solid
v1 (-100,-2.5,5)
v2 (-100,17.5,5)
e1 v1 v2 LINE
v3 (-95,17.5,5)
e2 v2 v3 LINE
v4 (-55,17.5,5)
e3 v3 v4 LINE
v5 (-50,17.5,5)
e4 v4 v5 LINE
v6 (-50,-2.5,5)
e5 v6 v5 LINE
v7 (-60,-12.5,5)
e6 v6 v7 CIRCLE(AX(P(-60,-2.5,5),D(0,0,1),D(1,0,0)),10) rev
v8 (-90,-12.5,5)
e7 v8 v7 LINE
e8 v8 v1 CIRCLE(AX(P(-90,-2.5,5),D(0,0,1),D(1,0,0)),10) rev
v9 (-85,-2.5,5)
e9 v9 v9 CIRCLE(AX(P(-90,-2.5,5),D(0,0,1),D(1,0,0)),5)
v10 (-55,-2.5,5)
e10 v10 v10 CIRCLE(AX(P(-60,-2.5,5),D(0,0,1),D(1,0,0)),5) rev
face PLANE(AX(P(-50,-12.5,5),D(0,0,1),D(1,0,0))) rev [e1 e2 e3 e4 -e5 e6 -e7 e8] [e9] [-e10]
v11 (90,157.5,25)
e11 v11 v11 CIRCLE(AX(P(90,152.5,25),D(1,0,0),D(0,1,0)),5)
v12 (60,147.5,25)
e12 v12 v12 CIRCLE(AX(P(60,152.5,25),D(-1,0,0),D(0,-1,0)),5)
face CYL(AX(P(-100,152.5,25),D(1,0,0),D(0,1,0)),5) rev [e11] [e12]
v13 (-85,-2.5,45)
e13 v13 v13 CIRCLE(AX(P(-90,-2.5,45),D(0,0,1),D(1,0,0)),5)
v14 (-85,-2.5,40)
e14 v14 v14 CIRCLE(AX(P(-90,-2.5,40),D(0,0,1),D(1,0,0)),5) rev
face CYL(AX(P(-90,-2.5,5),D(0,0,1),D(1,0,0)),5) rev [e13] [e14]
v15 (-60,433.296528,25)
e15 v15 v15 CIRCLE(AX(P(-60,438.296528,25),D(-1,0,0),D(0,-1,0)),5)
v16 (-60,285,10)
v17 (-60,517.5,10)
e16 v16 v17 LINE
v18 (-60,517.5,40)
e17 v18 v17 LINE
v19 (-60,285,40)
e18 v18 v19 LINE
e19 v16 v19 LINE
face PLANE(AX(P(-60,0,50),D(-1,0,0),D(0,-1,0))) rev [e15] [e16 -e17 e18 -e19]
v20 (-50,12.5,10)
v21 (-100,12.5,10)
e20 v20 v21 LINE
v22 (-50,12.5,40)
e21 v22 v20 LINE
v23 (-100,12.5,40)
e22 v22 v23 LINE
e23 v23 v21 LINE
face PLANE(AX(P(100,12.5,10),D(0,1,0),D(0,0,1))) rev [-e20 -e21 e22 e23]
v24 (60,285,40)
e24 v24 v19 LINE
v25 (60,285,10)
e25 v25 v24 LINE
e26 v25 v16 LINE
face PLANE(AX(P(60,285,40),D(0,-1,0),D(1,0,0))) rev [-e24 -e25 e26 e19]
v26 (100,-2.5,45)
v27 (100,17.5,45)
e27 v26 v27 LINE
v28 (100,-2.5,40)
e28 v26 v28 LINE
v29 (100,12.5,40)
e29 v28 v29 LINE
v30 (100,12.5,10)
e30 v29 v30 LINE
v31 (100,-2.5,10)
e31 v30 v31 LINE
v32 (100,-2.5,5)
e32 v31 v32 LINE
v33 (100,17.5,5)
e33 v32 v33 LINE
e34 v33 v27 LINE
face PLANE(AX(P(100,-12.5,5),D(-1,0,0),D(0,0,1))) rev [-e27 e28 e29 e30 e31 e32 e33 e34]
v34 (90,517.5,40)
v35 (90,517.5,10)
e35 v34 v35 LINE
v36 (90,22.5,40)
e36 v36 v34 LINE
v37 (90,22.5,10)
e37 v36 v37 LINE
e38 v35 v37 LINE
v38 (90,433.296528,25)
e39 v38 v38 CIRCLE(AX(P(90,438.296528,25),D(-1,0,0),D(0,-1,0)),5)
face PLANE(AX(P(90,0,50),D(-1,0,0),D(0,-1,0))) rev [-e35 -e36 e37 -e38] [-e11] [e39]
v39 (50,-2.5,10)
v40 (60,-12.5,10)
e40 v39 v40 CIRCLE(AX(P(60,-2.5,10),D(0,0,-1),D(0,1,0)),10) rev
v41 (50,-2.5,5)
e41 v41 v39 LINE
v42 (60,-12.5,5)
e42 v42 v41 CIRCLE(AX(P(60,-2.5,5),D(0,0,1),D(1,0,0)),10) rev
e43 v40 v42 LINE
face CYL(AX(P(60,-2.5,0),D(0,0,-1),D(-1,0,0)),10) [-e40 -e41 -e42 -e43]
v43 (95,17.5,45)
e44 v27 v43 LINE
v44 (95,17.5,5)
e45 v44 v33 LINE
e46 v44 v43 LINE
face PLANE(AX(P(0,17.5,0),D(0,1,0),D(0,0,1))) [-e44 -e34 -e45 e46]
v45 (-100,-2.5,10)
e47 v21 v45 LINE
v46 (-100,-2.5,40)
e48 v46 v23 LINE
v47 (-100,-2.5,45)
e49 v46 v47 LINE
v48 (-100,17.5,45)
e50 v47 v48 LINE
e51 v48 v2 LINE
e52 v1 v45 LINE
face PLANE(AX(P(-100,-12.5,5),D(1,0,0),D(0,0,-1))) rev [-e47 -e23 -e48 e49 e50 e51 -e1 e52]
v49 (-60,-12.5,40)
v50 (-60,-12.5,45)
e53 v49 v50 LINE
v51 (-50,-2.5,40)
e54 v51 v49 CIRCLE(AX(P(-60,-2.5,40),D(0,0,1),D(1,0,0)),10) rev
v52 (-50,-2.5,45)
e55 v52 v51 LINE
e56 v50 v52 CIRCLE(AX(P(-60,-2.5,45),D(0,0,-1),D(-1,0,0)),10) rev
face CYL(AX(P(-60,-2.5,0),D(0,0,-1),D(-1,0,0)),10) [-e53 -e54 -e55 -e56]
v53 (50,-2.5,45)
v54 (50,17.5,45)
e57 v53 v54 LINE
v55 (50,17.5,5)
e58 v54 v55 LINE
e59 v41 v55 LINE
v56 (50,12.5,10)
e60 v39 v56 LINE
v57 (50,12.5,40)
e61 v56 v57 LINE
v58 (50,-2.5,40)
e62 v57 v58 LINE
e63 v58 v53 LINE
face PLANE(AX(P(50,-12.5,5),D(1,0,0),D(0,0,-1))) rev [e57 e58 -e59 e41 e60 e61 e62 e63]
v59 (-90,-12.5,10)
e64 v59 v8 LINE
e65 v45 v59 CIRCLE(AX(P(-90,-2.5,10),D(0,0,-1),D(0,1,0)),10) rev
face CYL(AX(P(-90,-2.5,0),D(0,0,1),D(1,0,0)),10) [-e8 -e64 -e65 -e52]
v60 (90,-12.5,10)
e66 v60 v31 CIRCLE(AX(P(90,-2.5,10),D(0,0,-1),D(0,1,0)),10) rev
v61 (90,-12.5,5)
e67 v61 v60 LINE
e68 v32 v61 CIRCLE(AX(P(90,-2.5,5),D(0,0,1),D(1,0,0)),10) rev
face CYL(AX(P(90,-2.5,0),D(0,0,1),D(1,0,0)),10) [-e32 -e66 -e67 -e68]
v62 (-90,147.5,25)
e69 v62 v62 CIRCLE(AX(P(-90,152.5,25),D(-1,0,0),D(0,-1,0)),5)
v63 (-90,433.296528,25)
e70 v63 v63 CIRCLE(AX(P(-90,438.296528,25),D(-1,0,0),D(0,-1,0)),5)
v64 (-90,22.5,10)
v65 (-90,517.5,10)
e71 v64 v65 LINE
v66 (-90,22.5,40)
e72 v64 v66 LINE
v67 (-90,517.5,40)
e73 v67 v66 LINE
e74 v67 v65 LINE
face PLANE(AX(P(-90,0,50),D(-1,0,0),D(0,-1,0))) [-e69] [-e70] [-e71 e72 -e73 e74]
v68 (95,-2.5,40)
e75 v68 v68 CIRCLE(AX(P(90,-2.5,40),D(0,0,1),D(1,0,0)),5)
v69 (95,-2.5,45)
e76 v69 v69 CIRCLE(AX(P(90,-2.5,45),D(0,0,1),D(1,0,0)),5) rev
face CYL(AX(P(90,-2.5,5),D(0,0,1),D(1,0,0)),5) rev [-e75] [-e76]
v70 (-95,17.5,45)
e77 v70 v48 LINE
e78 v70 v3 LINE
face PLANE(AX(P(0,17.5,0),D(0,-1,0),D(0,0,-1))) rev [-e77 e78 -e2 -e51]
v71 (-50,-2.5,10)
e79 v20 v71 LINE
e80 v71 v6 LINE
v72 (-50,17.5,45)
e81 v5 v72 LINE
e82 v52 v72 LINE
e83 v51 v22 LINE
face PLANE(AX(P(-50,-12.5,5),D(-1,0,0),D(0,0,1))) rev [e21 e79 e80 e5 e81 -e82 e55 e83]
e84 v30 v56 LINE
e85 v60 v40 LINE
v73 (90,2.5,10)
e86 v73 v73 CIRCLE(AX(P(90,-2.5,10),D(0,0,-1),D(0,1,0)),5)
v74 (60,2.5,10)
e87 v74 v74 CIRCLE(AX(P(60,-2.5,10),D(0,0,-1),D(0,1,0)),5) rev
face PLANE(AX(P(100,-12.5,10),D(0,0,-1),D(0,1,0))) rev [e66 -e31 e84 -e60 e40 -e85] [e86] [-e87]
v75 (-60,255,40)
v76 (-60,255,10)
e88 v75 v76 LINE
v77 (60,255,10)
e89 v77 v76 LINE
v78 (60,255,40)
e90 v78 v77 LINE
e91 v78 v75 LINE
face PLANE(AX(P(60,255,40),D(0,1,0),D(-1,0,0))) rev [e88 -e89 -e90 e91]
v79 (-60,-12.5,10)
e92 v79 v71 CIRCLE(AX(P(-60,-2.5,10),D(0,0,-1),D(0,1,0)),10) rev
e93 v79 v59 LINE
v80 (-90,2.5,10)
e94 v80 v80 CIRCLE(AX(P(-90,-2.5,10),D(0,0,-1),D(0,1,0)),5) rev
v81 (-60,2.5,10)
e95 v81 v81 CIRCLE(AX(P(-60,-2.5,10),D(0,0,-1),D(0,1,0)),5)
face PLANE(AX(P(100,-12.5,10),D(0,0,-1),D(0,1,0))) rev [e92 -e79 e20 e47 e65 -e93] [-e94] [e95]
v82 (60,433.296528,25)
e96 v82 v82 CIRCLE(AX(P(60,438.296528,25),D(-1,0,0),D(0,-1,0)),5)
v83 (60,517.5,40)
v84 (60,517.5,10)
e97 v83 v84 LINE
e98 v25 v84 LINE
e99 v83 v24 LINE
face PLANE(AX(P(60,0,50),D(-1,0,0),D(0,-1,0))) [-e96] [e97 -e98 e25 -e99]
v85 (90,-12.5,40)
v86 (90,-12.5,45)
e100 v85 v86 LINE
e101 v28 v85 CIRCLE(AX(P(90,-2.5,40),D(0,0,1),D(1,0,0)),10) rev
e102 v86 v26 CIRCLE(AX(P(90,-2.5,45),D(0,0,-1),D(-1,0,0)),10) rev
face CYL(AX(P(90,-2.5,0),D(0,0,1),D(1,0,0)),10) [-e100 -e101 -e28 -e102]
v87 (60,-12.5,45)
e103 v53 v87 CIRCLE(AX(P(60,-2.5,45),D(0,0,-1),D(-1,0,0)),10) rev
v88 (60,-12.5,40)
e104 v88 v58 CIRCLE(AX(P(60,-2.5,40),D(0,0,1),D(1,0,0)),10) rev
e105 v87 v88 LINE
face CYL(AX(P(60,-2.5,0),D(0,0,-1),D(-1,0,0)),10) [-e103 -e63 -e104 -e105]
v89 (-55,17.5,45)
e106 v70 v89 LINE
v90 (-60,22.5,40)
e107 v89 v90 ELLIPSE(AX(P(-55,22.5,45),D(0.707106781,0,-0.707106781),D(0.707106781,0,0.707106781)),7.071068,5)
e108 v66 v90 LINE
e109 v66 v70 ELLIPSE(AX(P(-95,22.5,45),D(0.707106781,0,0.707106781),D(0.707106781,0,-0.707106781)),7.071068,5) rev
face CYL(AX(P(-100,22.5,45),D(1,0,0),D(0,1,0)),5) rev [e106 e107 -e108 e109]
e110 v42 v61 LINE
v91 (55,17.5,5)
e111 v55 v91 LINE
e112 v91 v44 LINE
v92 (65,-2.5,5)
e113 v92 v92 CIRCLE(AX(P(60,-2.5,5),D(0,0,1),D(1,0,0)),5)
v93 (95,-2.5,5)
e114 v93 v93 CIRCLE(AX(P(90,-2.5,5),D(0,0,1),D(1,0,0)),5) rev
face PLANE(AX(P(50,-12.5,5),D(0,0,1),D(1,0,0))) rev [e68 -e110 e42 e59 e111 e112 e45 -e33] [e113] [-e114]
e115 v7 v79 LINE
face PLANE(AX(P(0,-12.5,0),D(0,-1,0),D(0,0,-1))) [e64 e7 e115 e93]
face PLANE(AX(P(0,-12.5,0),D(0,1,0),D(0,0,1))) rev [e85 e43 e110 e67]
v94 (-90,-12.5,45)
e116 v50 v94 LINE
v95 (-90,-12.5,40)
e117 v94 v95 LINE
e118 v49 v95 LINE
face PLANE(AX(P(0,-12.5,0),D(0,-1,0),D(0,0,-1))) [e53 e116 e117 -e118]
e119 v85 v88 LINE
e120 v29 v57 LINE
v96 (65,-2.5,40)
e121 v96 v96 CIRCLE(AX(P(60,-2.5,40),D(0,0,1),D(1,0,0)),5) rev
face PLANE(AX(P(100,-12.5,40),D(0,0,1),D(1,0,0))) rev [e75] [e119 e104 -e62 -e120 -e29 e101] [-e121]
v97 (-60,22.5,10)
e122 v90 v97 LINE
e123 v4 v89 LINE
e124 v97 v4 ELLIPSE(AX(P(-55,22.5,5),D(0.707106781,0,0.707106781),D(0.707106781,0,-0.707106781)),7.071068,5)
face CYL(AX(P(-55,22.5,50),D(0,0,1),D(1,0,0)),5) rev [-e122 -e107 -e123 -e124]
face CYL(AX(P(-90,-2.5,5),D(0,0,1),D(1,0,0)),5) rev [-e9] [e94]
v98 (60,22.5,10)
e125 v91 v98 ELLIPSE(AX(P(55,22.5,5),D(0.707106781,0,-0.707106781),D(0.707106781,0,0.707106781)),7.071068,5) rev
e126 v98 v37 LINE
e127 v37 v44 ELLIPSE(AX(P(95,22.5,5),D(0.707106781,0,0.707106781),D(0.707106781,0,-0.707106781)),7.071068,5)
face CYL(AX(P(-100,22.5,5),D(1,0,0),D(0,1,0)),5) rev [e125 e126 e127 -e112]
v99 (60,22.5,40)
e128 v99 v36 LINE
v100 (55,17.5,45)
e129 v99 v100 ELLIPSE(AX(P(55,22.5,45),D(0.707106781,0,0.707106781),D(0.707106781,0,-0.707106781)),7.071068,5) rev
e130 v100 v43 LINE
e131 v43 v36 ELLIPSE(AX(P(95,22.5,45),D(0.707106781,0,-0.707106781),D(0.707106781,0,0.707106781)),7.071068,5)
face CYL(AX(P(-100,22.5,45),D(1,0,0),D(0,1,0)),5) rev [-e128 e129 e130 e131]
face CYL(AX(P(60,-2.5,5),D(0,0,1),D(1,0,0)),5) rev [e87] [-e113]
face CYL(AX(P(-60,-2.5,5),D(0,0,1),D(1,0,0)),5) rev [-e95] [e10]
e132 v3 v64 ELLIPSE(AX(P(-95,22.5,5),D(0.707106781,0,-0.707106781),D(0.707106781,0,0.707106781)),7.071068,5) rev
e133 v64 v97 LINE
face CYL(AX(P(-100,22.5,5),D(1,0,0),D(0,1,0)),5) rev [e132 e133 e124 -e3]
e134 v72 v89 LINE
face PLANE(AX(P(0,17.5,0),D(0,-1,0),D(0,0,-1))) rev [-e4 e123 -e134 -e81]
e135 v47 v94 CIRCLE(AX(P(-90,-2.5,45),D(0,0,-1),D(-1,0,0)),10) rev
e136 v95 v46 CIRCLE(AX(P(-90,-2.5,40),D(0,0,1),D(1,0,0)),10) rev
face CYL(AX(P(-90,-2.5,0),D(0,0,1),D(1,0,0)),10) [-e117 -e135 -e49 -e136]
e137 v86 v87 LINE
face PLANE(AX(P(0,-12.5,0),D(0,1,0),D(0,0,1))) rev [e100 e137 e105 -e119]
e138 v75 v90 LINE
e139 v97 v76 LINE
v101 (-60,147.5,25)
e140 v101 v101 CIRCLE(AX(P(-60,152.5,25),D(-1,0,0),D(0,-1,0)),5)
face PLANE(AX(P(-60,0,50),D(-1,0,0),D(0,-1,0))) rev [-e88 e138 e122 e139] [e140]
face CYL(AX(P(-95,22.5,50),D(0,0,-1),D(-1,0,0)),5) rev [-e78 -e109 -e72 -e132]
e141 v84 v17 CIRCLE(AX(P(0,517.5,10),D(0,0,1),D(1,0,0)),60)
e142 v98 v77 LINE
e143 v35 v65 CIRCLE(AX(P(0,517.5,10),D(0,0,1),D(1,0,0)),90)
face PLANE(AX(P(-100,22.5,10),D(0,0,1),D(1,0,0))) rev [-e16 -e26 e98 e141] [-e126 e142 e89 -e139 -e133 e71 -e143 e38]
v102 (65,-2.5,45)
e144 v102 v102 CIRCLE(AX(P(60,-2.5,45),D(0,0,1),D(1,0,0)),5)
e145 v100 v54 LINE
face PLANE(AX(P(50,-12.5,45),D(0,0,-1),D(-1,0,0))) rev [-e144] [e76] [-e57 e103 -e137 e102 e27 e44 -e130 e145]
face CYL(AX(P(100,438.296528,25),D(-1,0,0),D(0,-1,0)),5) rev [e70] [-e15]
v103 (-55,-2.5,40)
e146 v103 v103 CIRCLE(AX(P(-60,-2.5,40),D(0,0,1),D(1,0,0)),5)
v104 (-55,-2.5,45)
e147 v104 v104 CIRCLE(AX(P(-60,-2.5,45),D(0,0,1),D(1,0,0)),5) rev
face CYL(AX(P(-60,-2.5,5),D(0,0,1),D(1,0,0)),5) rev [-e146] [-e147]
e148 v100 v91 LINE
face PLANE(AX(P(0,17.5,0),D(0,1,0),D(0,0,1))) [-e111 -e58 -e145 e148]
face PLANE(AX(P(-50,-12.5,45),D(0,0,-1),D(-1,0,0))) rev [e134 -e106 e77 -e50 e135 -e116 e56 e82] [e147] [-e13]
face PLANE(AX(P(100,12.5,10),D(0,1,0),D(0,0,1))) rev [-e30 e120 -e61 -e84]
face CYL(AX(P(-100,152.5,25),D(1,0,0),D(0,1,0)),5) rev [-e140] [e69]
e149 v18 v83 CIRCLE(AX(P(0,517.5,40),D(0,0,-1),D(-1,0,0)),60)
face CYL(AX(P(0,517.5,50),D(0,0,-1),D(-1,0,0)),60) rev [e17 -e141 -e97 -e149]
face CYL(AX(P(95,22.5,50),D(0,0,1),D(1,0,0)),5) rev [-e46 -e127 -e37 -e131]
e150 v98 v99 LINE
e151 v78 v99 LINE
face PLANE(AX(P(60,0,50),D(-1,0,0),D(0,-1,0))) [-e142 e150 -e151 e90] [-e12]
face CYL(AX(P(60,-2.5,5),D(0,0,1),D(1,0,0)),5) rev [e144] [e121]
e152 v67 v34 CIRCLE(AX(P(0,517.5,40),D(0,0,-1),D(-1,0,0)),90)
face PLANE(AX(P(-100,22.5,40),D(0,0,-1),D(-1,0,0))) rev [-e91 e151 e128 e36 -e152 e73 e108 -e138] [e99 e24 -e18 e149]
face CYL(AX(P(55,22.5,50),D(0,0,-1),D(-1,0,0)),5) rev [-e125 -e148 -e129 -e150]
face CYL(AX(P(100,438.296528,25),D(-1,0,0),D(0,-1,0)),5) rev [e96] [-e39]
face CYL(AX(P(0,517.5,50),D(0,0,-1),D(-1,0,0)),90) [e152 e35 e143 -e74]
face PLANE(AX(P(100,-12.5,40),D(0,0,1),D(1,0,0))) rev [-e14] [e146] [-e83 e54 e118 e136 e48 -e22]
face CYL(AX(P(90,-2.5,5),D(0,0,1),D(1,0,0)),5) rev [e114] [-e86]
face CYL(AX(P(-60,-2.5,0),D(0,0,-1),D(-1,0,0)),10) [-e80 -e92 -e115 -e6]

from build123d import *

# Parameters (mm, degrees)
SKETCH1_R               = 5
BOSS_EXTRUDE1_DEPTH     = 50
SKETCH2_W               = 30
SKETCH2_H               = 30
CUT_EXTRUDE1_DEPTH      = 639.479639456
SKETCH3_W               = 30
SKETCH3_H               = 30
SKETCH3_W_2             = 5
SKETCH3_H_2             = 35
CUT_EXTRUDE2_DEPTH      = 642.526499842
FILLET1_R               = 5
SKETCH4_R               = 5
CUT_EXTRUDE3_DEPTH      = 639.10755363
SKETCH5_W               = 30
SKETCH5_H               = 30
BOSS_EXTRUDE2_DEPTH     = 120
SKETCH6_W               = 41.881061045
SKETCH6_H               = 38.598384764
CUT_EXTRUDE4_DEPTH      = 642.156182221
SKETCH7_W               = 50
SKETCH7_H               = 40
BOSS_EXTRUDE3_DEPTH     = 30
SKETCH8_R               = 5
CUT_EXTRUDE5_DEPTH      = 617.973459721
FILLET2_R               = 10
SKETCH9_W               = 30
SKETCH9_H               = 25
CUT_EXTRUDE6_DEPTH      = 642.156182221
CUT_EXTRUDE7_DEPTH      = 639.10755363
CUT_EXTRUDE7_DEPTH_BACK = 639.10755363
SKETCH10_R              = 5


with BuildPart() as part:
    # Sketch1 → Boss-Extrude1 (new body)
    with BuildSketch(Plane.XY):
        with BuildLine():
            Line((90, 17.5), (90, 517.5))
            ThreePointArc((90, 517.5), (0, 607.5), (-90, 517.5))
            Line((-90, 517.5), (-90, 17.5))
            Line((-90, 17.5), (-100, 17.5))
            Line((-100, 17.5), (-100, -7.5))
            ThreePointArc((-100, -7.5), (-97.071067812, -14.571067812), (-90, -17.5))
            Line((-90, -17.5), (-60, -17.5))
            ThreePointArc((-60, -17.5), (-52.928932188, -14.571067812), (-50, -7.5))
            Line((-50, -7.5), (-50, 17.5))
            Line((-50, 17.5), (-60, 17.5))
            Line((-60, 17.5), (-60, 517.5))
            ThreePointArc((-60, 517.5), (0, 577.5), (60, 517.5))
            Line((60, 517.5), (60, 17.5))
            Line((60, 17.5), (50, 17.5))
            Line((50, 17.5), (50, -7.5))
            ThreePointArc((50, -7.5), (52.928932188, -14.571067812), (60, -17.5))
            Line((60, -17.5), (90, -17.5))
            ThreePointArc((90, -17.5), (97.071067812, -14.571067812), (100, -7.5))
            Line((100, -7.5), (100, 17.5))
            Line((100, 17.5), (90, 17.5))
        make_face()
        with Locations((90, -7.5)):
            Circle(SKETCH1_R, mode=Mode.SUBTRACT)
        with Locations((60, -7.5)):
            Circle(SKETCH1_R, mode=Mode.SUBTRACT)
        with Locations((-90, -7.5)):
            Circle(SKETCH1_R, mode=Mode.SUBTRACT)
        with Locations((-60, -7.5)):
            Circle(SKETCH1_R, mode=Mode.SUBTRACT)
    extrude(amount=BOSS_EXTRUDE1_DEPTH)

    # Sketch2 → Cut-Extrude1 (cut, through all)
    with BuildSketch(Plane(origin=(90, 0, 0), x_dir=(0, 0, -1), z_dir=(1, 0, 0))):
        with BuildLine():
            Line((-50, 17.5), (-45, 17.5))
            ThreePointArc((-45, 17.5), (-41.464466094, 18.964466094), (-40, 22.5))
            Line((-40, 22.5), (-40, 607.5))
            Line((-40, 607.5), (-50, 607.5))
            Line((-50, 607.5), (-50, 17.5))
        make_face()
        with Locations((-25, -2.5)):
            Rectangle(SKETCH2_W, SKETCH2_H)
        with BuildLine():
            Line((-5, 17.5), (0, 17.5))
            Line((0, 17.5), (0, 607.5))
            Line((0, 607.5), (-10, 607.5))
            Line((-10, 607.5), (-10, 22.5))
            ThreePointArc((-10, 22.5), (-8.535533906, 18.964466094), (-5, 17.5))
        make_face()
    extrude(amount=-CUT_EXTRUDE1_DEPTH, mode=Mode.SUBTRACT)

    # Sketch3 → Cut-Extrude2 (cut, through all)
    with BuildSketch(Plane(origin=(100, 0, 0), x_dir=(0, 0, -1), z_dir=(1, 0, 0))):
        with Locations((-25, -2.5)):
            Rectangle(SKETCH3_W, SKETCH3_H)
        with Locations((-47.5, 0)):
            Rectangle(SKETCH3_W_2, SKETCH3_H_2)
        with Locations((-2.5, 0)):
            Rectangle(SKETCH3_W_2, SKETCH3_H_2)
    extrude(amount=-CUT_EXTRUDE2_DEPTH, mode=Mode.SUBTRACT)

    # Fillet1
    # the kernel refuses this fillet: 5 mm, written as the material it adds along each edge
    with BuildSketch(Plane(origin=(-90, 17.5, 5), x_dir=(-1, 0, 0), z_dir=(0, 0, 1))) as fillet1_piece_1_section:
        with BuildLine():
            CenterArc((FILLET1_R, -FILLET1_R), FILLET1_R, 90, 90)
            Line((0, -FILLET1_R), (0, 0))
            Line((0, 0), (FILLET1_R, 0))
        make_face()
    fillet1_piece_1 = extrude(amount=40, mode=Mode.PRIVATE)
    fillet1_piece_1 = fillet1_piece_1 - Plane(origin=(-91.427889151, 22.5, 45), x_dir=(0, -1, 0), z_dir=(1, 0, 0)) * Cylinder(5, 101, mode=Mode.PRIVATE)
    fillet1_piece_1 = fillet1_piece_1 - Plane(origin=(-91.427889151, 22.5, 5), x_dir=(0, 0, 1), z_dir=(1, 0, 0)) * Cylinder(5, 101, mode=Mode.PRIVATE)
    add(fillet1_piece_1)
    with BuildSketch(Plane(origin=(60, 17.5, 5), x_dir=(-1, 0, 0), z_dir=(0, 0, 1))) as fillet1_piece_2_section:
        with BuildLine():
            CenterArc((FILLET1_R, -FILLET1_R), FILLET1_R, 90, 90)
            Line((0, -FILLET1_R), (0, 0))
            Line((0, 0), (FILLET1_R, 0))
        make_face()
    fillet1_piece_2 = extrude(amount=40, mode=Mode.PRIVATE)
    fillet1_piece_2 = fillet1_piece_2 - Plane(origin=(58.572110849, 22.5, 5), x_dir=(0, 0, 1), z_dir=(1, 0, 0)) * Cylinder(5, 101, mode=Mode.PRIVATE)
    fillet1_piece_2 = fillet1_piece_2 - Plane(origin=(58.572110849, 22.5, 45), x_dir=(0, -1, 0), z_dir=(1, 0, 0)) * Cylinder(5, 101, mode=Mode.PRIVATE)
    add(fillet1_piece_2)
    with BuildSketch(Plane(origin=(-60, 17.5, 5), x_dir=(1, 0, 0), z_dir=(0, 0, 1))) as fillet1_piece_3_section:
        with BuildLine():
            CenterArc((FILLET1_R, FILLET1_R), FILLET1_R, 180, 90)
            Line((0, FILLET1_R), (0, 0))
            Line((0, 0), (FILLET1_R, 0))
        make_face()
    fillet1_piece_3 = extrude(amount=40, mode=Mode.PRIVATE)
    fillet1_piece_3 = fillet1_piece_3 - Plane(origin=(-58.572110849, 22.5, 45), x_dir=(0, -1, 0), z_dir=(1, 0, 0)) * Cylinder(5, 101, mode=Mode.PRIVATE)
    fillet1_piece_3 = fillet1_piece_3 - Plane(origin=(-58.572110849, 22.5, 5), x_dir=(0, 0, 1), z_dir=(1, 0, 0)) * Cylinder(5, 101, mode=Mode.PRIVATE)
    add(fillet1_piece_3)
    with BuildSketch(Plane(origin=(90, 17.5, 5), x_dir=(0, 1, 0), z_dir=(0, 0, 1))) as fillet1_piece_4_section:
        with BuildLine():
            CenterArc((FILLET1_R, -FILLET1_R), FILLET1_R, 90, 90)
            Line((0, -FILLET1_R), (0, 0))
            Line((0, 0), (FILLET1_R, 0))
        make_face()
    fillet1_piece_4 = extrude(amount=40, mode=Mode.PRIVATE)
    fillet1_piece_4 = fillet1_piece_4 - Plane(origin=(91.427889151, 22.5, 5), x_dir=(0, 0, 1), z_dir=(1, 0, 0)) * Cylinder(5, 101, mode=Mode.PRIVATE)
    fillet1_piece_4 = fillet1_piece_4 - Plane(origin=(91.427889151, 22.5, 45), x_dir=(0, -1, 0), z_dir=(1, 0, 0)) * Cylinder(5, 101, mode=Mode.PRIVATE)
    add(fillet1_piece_4)

    # Sketch4 → Cut-Extrude3 (cut, through all)
    with BuildSketch(Plane(origin=(90, 0, 0), x_dir=(0, 0, -1), z_dir=(1, 0, 0))):
        with Locations(Location((-25, 152.5, 0), (0, 0, 90))):
            Circle(SKETCH4_R)
    extrude(amount=-CUT_EXTRUDE3_DEPTH, mode=Mode.SUBTRACT)

    # Sketch5 → Boss-Extrude2 (add)
    with BuildSketch(Plane(origin=(-60, 0, 0), x_dir=(0, 0, -1), z_dir=(1, 0, 0))):
        with Locations((-25, 270)):
            Rectangle(SKETCH5_W, SKETCH5_H)
    extrude(amount=BOSS_EXTRUDE2_DEPTH)

    # Sketch6 → Cut-Extrude4 (cut, through all)
    with BuildSketch(Plane(origin=(100, 0, 0), x_dir=(0, 0, -1), z_dir=(1, 0, 0))):
        with Locations((-24.059469477, -1.799192382)):
            Rectangle(SKETCH6_W, SKETCH6_H)
    extrude(amount=-CUT_EXTRUDE4_DEPTH, mode=Mode.SUBTRACT)

    # Sketch7 → Boss-Extrude3 (add)
    with BuildSketch(Plane.XZ.offset(-17.5)):
        with Locations((-75, 25)):
            Rectangle(SKETCH7_W, SKETCH7_H)
        with Locations((75, 25)):
            Rectangle(SKETCH7_W, SKETCH7_H)
    extrude(amount=BOSS_EXTRUDE3_DEPTH)

    # Sketch8 → Cut-Extrude5 (cut, through all)
    with BuildSketch(Plane.XY.offset(45)):
        with Locations((-90, -2.5)):
            Circle(SKETCH8_R)
        with Locations((-60, -2.5)):
            Circle(SKETCH8_R)
        with Locations((60, -2.5)):
            Circle(SKETCH8_R)
        with Locations((90, -2.5)):
            Circle(SKETCH8_R)
    extrude(amount=-CUT_EXTRUDE5_DEPTH, mode=Mode.SUBTRACT)

    # Fillet2
    fillet2_edges = [part.edges().sort_by_distance(p)[0] for p in [
        (-100, -12.5, 25),
        (-50, -12.5, 25),
        (50, -12.5, 25),
        (100, -12.5, 25),
    ]]
    fillet(fillet2_edges, radius=FILLET2_R)

    # Sketch9 → Cut-Extrude6 (cut, through all)
    with BuildSketch(Plane.ZY.offset(100)):
        with Locations((25, 0)):
            Rectangle(SKETCH9_W, SKETCH9_H)
    extrude(amount=-CUT_EXTRUDE6_DEPTH, mode=Mode.SUBTRACT)

    # Sketch10 → Cut-Extrude7 (cut, two sides: drawn at the far end of the back side and taken through both)
    with BuildSketch(Plane.ZY.offset(90).offset(-CUT_EXTRUDE7_DEPTH_BACK)):
        with Locations(Location((25, 438.296527551, 0), (0, 0, 270))):
            Circle(SKETCH10_R)
    extrude(amount=CUT_EXTRUDE7_DEPTH + CUT_EXTRUDE7_DEPTH_BACK, mode=Mode.SUBTRACT)


solid = part.part
